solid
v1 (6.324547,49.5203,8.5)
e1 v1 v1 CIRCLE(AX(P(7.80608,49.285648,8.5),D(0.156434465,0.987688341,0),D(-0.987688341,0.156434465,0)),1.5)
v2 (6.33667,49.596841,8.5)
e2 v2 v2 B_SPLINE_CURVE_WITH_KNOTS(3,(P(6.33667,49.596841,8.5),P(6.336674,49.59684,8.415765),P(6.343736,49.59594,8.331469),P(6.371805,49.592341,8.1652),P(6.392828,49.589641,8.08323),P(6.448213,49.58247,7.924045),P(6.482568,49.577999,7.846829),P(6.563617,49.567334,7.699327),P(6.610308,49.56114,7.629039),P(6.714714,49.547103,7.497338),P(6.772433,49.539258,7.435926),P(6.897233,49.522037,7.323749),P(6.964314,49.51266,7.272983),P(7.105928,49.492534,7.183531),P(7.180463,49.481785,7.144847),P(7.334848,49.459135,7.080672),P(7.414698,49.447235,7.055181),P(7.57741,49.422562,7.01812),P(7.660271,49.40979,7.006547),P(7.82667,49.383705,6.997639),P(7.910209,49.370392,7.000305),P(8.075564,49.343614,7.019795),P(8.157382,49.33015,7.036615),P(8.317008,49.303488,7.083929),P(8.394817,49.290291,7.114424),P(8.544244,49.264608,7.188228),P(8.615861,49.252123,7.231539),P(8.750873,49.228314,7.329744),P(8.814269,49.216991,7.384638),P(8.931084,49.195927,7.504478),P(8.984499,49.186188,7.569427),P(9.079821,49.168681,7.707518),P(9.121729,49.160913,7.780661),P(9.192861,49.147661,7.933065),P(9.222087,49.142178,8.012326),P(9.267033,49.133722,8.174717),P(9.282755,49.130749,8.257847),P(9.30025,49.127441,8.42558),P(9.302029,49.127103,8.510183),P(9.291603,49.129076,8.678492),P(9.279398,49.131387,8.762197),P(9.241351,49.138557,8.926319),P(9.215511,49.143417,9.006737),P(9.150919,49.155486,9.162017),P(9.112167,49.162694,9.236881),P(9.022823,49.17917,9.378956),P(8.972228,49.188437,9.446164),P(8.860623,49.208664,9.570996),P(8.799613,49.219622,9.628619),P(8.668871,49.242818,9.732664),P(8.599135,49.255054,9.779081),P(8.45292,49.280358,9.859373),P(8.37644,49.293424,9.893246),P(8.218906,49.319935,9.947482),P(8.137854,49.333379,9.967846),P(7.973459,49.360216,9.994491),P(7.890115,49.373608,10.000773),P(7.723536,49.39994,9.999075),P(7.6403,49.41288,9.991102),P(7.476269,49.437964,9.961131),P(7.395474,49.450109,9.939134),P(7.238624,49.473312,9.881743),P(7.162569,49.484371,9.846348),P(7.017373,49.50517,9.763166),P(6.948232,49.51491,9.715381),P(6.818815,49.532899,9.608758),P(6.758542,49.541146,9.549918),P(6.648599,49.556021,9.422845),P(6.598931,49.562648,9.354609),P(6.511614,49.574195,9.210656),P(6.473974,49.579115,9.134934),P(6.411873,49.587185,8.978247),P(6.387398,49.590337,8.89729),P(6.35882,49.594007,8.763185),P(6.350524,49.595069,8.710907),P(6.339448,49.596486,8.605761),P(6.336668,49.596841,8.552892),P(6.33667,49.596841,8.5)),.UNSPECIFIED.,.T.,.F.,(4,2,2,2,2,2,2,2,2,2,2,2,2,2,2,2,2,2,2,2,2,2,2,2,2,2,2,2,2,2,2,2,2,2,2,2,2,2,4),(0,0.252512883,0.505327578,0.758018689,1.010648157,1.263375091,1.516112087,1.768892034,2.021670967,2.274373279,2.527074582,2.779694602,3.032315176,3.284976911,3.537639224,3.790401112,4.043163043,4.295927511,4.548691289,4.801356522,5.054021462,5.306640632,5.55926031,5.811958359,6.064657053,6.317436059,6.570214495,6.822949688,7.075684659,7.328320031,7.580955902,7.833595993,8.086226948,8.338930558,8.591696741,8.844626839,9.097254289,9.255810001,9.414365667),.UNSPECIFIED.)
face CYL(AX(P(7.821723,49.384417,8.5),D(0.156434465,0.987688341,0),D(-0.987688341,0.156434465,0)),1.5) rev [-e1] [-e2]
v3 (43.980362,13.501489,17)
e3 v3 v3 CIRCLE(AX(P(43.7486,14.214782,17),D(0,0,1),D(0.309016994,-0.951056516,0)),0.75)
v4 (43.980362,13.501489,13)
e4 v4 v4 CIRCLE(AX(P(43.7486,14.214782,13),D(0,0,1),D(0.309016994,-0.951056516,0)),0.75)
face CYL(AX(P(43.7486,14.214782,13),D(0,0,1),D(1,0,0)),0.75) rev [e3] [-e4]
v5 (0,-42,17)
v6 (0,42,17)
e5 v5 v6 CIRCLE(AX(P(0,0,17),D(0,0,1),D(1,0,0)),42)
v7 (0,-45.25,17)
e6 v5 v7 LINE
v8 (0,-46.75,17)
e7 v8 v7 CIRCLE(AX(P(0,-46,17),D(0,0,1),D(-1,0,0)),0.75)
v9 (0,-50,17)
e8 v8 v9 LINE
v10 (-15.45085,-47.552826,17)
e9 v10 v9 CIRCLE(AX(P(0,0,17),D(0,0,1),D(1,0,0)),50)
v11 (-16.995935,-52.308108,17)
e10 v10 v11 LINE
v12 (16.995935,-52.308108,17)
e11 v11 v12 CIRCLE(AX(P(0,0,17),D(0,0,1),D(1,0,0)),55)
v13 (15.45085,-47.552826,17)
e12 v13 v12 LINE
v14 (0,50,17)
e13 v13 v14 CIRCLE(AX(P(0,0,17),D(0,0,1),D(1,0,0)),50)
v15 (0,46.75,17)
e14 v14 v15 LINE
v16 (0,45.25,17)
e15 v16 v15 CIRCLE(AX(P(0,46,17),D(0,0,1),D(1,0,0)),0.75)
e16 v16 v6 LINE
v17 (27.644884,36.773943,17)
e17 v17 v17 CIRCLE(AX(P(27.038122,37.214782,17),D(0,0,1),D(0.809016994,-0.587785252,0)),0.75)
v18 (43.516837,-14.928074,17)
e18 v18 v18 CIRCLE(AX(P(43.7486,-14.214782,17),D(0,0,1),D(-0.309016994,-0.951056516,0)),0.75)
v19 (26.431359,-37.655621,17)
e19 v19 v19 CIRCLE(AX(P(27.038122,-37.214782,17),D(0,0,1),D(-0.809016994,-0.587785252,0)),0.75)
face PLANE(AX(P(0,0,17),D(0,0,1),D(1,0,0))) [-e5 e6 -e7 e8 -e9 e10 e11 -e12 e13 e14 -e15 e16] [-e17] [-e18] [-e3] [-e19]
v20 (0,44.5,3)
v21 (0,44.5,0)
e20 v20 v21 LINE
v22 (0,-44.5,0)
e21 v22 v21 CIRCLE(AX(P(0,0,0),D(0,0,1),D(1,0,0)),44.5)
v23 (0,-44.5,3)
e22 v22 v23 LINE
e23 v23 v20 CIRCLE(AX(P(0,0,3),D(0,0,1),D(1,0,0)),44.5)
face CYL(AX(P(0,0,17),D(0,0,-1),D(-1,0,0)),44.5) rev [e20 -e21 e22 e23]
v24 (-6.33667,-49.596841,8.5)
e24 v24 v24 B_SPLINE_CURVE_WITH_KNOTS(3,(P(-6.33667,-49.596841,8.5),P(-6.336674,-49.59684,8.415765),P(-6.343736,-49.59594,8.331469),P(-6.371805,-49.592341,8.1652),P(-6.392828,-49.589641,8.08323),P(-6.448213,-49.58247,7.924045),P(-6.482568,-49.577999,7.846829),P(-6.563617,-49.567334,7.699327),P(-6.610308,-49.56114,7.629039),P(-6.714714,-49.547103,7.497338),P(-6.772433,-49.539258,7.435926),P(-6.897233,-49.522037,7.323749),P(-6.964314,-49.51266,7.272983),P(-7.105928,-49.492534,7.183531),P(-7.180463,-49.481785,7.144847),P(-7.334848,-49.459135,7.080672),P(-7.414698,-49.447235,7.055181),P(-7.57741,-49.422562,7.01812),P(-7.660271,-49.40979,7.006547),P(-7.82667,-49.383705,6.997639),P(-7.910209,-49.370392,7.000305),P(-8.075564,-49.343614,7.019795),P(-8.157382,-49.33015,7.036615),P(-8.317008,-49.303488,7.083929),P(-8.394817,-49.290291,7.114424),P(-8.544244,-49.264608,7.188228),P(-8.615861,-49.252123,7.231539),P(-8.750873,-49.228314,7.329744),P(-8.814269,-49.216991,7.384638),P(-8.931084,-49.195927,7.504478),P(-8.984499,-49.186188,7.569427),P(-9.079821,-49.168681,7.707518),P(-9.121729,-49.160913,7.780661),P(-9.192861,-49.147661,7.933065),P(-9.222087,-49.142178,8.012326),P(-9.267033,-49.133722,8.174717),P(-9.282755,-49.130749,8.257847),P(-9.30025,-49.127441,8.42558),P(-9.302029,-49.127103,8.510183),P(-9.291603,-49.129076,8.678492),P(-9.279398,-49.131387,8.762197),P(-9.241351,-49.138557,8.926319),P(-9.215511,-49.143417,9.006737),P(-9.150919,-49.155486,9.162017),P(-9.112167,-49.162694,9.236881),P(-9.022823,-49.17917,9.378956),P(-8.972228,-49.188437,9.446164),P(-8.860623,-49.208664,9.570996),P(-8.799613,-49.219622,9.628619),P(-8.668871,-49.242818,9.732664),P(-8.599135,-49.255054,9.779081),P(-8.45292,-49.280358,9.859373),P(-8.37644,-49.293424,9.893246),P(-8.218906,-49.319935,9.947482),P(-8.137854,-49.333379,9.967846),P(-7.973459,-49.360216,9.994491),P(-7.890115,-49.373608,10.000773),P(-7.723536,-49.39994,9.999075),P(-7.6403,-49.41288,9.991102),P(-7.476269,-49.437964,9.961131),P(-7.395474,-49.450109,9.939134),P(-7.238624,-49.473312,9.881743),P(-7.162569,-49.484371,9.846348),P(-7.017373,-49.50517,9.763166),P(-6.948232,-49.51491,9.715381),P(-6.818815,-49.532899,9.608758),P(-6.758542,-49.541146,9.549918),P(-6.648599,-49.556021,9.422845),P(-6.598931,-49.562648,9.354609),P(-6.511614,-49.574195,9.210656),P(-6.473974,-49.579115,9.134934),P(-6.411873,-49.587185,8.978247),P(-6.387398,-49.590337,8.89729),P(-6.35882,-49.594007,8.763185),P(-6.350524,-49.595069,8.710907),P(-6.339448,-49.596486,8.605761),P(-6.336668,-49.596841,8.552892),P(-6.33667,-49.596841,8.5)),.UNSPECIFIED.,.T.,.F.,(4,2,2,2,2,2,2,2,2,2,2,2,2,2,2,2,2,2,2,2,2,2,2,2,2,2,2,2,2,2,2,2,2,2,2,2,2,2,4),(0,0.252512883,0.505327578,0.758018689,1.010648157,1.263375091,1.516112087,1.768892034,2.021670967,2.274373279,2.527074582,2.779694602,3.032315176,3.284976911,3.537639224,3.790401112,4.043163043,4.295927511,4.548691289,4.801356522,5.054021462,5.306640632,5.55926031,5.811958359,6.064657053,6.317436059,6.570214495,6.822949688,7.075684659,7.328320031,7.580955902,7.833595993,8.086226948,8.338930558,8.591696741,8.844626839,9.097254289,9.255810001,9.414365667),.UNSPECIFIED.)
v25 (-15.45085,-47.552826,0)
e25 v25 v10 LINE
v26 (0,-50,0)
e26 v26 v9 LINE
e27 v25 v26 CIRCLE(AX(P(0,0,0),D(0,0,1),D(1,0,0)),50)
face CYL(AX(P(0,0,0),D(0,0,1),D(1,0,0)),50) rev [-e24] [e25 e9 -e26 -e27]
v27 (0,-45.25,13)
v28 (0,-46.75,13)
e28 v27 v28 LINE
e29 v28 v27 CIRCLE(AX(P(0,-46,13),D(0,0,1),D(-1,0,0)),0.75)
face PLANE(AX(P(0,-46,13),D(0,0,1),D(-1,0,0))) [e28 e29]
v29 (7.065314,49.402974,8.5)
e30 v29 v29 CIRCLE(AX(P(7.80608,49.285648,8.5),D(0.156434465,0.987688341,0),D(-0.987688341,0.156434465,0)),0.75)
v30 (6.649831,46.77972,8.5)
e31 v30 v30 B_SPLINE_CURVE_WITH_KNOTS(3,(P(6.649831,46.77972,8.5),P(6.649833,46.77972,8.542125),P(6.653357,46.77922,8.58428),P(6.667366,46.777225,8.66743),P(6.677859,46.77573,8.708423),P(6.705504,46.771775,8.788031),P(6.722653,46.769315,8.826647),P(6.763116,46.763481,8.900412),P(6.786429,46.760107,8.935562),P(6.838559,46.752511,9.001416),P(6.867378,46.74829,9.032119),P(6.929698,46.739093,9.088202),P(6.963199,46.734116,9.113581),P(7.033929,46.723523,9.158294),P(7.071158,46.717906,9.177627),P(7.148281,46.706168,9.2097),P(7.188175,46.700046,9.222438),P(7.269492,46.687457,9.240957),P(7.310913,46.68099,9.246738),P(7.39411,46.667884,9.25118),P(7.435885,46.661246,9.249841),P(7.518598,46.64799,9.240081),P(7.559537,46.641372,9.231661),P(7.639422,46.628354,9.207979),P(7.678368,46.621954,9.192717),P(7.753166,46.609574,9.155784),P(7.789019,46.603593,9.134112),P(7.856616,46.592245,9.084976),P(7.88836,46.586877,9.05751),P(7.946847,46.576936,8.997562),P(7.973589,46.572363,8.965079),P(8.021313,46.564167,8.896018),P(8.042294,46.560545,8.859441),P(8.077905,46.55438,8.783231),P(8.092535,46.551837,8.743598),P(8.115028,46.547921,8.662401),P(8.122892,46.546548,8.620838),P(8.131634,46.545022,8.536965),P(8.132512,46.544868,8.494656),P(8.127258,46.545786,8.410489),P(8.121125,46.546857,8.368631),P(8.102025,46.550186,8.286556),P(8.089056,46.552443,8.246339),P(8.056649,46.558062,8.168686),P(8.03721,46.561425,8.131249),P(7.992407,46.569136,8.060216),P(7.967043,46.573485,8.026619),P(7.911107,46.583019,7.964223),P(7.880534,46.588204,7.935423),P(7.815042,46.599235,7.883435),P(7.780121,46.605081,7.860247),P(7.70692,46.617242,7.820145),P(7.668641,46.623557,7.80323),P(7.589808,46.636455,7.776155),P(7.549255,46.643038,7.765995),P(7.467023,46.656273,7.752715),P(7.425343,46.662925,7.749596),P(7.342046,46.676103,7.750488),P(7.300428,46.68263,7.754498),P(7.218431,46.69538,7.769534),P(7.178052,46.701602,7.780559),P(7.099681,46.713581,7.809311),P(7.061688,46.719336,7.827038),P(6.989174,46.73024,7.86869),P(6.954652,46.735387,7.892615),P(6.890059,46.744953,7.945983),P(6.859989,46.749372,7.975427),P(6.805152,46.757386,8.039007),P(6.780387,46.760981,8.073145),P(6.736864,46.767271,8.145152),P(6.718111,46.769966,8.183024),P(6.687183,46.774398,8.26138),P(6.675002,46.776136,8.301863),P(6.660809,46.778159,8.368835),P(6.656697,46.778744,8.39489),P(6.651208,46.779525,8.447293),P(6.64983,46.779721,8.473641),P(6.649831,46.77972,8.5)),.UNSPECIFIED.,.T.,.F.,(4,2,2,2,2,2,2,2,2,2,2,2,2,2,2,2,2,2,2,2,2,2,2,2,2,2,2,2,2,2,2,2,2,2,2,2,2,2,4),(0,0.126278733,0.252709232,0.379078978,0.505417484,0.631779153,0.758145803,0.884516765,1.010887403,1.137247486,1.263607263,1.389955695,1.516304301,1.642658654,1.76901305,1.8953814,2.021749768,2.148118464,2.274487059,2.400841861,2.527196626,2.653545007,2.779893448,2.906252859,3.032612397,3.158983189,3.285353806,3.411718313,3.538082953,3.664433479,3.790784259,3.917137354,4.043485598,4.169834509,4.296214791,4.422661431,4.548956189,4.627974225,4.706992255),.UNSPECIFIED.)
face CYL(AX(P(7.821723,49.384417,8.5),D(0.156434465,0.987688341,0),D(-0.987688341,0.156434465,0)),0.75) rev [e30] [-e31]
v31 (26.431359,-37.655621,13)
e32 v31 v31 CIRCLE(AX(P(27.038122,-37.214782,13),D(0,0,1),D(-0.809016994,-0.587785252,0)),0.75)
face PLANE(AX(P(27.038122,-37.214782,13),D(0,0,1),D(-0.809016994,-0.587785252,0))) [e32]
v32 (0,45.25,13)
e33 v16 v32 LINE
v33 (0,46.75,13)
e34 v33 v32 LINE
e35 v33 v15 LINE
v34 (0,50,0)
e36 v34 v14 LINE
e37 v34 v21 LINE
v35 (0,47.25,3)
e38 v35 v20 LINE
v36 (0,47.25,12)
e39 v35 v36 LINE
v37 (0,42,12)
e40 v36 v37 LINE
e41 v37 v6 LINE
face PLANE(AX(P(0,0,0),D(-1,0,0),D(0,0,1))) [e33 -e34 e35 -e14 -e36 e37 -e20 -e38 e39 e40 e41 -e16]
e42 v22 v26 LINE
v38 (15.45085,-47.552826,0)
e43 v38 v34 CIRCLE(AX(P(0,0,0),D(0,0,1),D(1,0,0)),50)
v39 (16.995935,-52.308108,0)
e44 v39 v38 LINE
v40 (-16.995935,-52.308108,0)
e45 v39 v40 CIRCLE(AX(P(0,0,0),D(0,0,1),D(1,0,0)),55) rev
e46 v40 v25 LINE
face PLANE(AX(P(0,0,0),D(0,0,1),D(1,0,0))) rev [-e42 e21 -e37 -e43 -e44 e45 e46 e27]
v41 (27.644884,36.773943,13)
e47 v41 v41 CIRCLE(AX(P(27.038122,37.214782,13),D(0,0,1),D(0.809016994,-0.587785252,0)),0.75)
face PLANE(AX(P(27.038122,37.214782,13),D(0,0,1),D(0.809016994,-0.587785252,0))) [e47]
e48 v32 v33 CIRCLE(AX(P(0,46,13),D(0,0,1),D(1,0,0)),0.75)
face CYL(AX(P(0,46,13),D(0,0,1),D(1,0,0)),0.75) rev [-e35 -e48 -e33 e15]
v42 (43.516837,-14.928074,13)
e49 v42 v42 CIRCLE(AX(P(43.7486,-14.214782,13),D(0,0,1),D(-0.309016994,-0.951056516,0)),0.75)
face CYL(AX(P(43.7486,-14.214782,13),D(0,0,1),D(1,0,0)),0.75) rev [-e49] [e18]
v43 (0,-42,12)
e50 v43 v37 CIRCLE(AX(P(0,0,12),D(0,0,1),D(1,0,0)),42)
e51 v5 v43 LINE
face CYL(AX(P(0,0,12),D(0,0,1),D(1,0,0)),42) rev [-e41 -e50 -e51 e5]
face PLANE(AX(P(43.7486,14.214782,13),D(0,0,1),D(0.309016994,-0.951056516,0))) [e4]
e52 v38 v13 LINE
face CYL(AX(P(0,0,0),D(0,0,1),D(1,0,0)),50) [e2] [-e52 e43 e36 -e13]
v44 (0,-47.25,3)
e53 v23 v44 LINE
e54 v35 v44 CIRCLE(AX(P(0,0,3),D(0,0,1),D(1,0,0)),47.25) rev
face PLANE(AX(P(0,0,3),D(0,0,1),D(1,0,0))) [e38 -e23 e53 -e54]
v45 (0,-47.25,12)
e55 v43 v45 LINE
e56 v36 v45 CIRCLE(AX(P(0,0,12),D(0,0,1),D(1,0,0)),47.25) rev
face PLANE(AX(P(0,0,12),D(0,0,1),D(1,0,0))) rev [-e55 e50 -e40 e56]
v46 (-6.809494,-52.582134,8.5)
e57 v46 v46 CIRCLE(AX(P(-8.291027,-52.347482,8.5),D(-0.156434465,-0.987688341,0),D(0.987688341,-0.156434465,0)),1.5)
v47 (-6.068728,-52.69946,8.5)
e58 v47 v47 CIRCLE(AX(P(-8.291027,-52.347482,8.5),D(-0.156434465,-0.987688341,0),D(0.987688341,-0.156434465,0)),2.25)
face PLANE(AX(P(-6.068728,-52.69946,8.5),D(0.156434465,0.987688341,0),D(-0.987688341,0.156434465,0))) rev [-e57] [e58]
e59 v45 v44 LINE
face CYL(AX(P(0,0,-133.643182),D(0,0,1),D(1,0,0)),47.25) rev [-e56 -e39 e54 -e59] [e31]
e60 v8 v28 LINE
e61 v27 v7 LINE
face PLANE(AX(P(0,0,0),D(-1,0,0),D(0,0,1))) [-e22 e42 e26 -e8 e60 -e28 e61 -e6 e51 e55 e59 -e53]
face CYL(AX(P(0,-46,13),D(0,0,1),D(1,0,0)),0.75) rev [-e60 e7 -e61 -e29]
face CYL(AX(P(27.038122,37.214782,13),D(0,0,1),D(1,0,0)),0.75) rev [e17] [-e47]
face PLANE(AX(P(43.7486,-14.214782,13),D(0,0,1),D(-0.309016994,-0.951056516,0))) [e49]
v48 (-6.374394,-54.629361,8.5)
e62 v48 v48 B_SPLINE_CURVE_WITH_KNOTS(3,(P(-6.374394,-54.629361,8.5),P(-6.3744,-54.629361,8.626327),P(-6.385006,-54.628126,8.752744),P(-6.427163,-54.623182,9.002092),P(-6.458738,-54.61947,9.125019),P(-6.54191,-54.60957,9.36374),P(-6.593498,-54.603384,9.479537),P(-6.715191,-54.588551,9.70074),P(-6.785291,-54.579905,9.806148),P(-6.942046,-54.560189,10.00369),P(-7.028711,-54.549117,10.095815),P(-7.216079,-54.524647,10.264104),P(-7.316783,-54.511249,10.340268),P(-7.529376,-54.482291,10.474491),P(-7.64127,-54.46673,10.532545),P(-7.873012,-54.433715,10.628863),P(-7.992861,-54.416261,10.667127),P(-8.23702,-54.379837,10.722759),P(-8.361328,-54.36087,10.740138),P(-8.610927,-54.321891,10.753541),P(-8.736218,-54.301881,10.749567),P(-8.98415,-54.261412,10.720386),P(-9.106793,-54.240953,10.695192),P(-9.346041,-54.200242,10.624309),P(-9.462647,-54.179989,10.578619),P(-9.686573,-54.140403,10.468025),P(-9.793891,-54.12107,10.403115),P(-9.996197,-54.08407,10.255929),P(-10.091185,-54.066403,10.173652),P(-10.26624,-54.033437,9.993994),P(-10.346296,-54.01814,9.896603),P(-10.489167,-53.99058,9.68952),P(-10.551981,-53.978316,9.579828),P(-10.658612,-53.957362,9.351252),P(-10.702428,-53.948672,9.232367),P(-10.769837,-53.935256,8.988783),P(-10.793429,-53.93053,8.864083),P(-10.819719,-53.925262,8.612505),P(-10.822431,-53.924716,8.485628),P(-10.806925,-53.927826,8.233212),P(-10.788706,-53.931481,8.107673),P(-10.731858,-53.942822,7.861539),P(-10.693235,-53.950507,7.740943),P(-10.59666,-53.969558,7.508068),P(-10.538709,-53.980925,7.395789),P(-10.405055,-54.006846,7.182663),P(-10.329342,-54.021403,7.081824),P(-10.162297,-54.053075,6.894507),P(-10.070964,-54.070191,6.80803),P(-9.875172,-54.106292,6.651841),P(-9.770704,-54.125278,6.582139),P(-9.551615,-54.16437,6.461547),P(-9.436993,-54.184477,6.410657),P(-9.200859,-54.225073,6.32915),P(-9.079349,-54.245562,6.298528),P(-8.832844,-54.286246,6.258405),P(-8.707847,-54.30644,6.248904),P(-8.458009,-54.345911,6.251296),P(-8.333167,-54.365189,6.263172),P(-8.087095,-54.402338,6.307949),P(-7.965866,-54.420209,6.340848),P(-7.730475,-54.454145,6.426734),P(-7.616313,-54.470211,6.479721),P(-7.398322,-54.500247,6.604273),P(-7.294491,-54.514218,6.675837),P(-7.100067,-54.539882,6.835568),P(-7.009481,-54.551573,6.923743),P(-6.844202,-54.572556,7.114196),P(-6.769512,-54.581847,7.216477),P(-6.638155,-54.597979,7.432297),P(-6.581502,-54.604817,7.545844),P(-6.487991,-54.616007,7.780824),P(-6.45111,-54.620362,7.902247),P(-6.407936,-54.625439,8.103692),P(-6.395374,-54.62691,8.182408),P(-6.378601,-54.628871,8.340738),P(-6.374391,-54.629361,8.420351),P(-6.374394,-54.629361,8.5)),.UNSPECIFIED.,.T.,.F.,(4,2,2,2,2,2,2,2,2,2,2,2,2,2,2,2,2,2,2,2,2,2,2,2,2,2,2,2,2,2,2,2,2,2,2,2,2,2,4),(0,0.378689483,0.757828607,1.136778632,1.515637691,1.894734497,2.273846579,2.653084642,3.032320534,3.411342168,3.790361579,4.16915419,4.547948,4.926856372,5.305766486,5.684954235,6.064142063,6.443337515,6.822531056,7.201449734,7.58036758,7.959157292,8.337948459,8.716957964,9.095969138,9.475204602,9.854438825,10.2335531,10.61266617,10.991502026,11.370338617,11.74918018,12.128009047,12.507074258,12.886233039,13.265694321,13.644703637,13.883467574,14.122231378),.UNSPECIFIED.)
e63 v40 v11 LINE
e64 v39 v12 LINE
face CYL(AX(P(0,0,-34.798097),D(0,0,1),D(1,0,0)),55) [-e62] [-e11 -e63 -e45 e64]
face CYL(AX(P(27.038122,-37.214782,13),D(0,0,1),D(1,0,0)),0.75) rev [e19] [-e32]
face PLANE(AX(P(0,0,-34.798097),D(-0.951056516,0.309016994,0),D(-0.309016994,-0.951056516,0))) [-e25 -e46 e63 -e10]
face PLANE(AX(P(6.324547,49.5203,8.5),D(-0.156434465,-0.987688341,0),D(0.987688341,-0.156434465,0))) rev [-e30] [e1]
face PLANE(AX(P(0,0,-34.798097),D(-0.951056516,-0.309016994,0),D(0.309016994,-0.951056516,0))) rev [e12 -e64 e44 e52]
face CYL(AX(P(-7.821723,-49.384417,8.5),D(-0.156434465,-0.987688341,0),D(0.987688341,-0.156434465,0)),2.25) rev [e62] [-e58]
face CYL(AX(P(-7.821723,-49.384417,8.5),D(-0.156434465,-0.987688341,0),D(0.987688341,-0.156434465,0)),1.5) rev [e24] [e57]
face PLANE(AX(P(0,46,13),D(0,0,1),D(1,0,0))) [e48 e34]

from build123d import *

# Parameters (mm, degrees)
SKETCH_1_R               = 49.25
SKETCH_1_R_2             = 44.5
EXTRUDE_1_DEPTH          = 17
CUT_EXTRUDE_START        = 17
SKETCH_1_5_R             = 47.25
CUT_EXTRUDE_2_DEPTH      = 14
EXTRUDE_START            = 12
SKETCH_1_6_R             = 49.25
SKETCH_1_6_R_2           = 42
EXTRUDE_2_DEPTH          = 5
SKETCH_2_R               = 50
SKETCH_2_R_2             = 49.25
EXTRUDE_3_DEPTH          = 17
SKETCH_2_4_R             = 0.75
CUT_EXTRUDE_3_DEPTH      = 4
PATTERN_CIRCULAR_1_COUNT = 10
EXTRUDE_START_2          = 8.5
EXTRUDE_4_DEPTH          = 17
PATTERN_CIRCULAR_2_COUNT = 2
CUT_EXTRUDE_START_2      = -8.5
CUT_EXTRUDE_5_DEPTH      = 17


# Read off the part's stored shape, not the designer's step: 切除-拉伸5
with BuildPart() as part:
    # 草图1 → 凸台-拉伸1 (new body)
    with BuildSketch(Plane.XY):
        Circle(SKETCH_1_R)
        Circle(SKETCH_1_R_2, mode=Mode.SUBTRACT)
    extrude(amount=EXTRUDE_1_DEPTH)

    # 草图1<5> → 切除-拉伸2 (cut)
    with BuildSketch(Plane.XY.offset(CUT_EXTRUDE_START)):
        Circle(SKETCH_1_5_R)
    extrude(amount=-CUT_EXTRUDE_2_DEPTH, mode=Mode.SUBTRACT)

    # 草图1<6> → 凸台-拉伸2 (add)
    with BuildSketch(Plane.XY.offset(EXTRUDE_START)):
        Circle(SKETCH_1_6_R)
        Circle(SKETCH_1_6_R_2, mode=Mode.SUBTRACT)
    extrude(amount=EXTRUDE_2_DEPTH)

    # 草图2 → 凸台-拉伸3 (add, through all)
    with BuildSketch(Plane.XY.offset(17)):
        Circle(SKETCH_2_R)
        Circle(SKETCH_2_R_2, mode=Mode.SUBTRACT)
    extrude(amount=-EXTRUDE_3_DEPTH)

    # 草图2<4> → 切除-拉伸3 (cut)
    with BuildSketch(Plane.XY.offset(17)):
        with Locations((0, 46)):
            Circle(SKETCH_2_4_R)
    cut_extrude_3 = extrude(amount=-CUT_EXTRUDE_3_DEPTH, mode=Mode.SUBTRACT)

    # 阵列(圆周)1: 切除-拉伸3 ×10 about axis
    pattern_circular_1_axis = Axis((0, 0, 0), (0, 0, 1))
    for i in range(1, PATTERN_CIRCULAR_1_COUNT):
        add(cut_extrude_3.rotate(pattern_circular_1_axis, i * 360 / PATTERN_CIRCULAR_1_COUNT), mode=Mode.SUBTRACT)

    # 草图3 → 凸台-拉伸4 (add)
    with BuildSketch(Plane.XY.offset(8.5).offset(EXTRUDE_START_2)):
        with BuildLine():
            Line((15.450849719, 47.552825815), (16.995934691, 52.308108396))
            ThreePointArc((16.995934691, 52.308108396), (0, 55), (-16.995934691, 52.308108396))
            Line((-16.995934691, 52.308108396), (-15.450849719, 47.552825815))
            ThreePointArc((-15.450849719, 47.552825815), (0, 50), (15.450849719, 47.552825815))
        make_face()
    extrude_4 = extrude(amount=-EXTRUDE_4_DEPTH)

    # 草图3<5> → 切除-旋转1 (revolve, cut)
    with BuildSketch(Plane.XY.offset(8.5)):
        Polygon((6.324547295, 49.520299893), (7.06531355, 49.402974044), (7.806079806, 49.285648196), (8.291026647, 52.347482052), (6.809494136, 52.582133749), align=None)
        Polygon((7.806079806, 49.285648196), (7.06531355, 49.402974044), (6.43957569, 45.452220682), (7.180341945, 45.334894833), align=None)
        Polygon((6.809494136, 52.582133749), (8.291026647, 52.347482052), (8.603895577, 54.322858733), (6.381596811, 54.674836279), (6.068727881, 52.699459598), align=None)
    cut_revolve_1 = revolve(axis=Axis((7.821723252, 49.38441703, 8.5), (-0.15643446504023117, -0.9876883405951378, 0)), mode=Mode.SUBTRACT)

    # 阵列(圆周)2: 凸台-拉伸4, 切除-旋转1 ×2 about axis
    pattern_circular_2_axis = Axis((0, 0, 0), (0, 0, 1))
    add([extrude_4.rotate(pattern_circular_2_axis, i * 360 / PATTERN_CIRCULAR_2_COUNT) for i in range(1, PATTERN_CIRCULAR_2_COUNT)])
    add([cut_revolve_1.rotate(pattern_circular_2_axis, i * 360 / PATTERN_CIRCULAR_2_COUNT) for i in range(1, PATTERN_CIRCULAR_2_COUNT)], mode=Mode.SUBTRACT)

    # 切除-拉伸5 outline → 切除-拉伸5 (cut)
    with BuildSketch(Plane.XY.offset(8.5).offset(CUT_EXTRUDE_START_2)):
        with BuildLine():
            ThreePointArc((0, 50), (7.821723252, 49.38441703), (15.450849719, 47.552825815))
            Line((15.450849719, 47.552825815), (16.995934691, 52.308108396))
            ThreePointArc((16.995934691, 52.308108396), (0, 55), (-16.995934691, 52.308108396))
            Line((-16.995934691, 52.308108396), (-15.450849719, 47.552825815))
            ThreePointArc((-15.450849719, 47.552825815), (-50, 0), (-15.450849719, -47.552825815))
            ThreePointArc((-15.450849719, -47.552825815), (-7.821723252, -49.38441703), (0, -50))
            Line((0, -50), (0, -42))
            ThreePointArc((0, -42), (-42, 0), (0, 42))
            Line((0, 42), (0, 50))
        make_face()
    extrude(amount=CUT_EXTRUDE_5_DEPTH, mode=Mode.SUBTRACT)


solid = part.part
